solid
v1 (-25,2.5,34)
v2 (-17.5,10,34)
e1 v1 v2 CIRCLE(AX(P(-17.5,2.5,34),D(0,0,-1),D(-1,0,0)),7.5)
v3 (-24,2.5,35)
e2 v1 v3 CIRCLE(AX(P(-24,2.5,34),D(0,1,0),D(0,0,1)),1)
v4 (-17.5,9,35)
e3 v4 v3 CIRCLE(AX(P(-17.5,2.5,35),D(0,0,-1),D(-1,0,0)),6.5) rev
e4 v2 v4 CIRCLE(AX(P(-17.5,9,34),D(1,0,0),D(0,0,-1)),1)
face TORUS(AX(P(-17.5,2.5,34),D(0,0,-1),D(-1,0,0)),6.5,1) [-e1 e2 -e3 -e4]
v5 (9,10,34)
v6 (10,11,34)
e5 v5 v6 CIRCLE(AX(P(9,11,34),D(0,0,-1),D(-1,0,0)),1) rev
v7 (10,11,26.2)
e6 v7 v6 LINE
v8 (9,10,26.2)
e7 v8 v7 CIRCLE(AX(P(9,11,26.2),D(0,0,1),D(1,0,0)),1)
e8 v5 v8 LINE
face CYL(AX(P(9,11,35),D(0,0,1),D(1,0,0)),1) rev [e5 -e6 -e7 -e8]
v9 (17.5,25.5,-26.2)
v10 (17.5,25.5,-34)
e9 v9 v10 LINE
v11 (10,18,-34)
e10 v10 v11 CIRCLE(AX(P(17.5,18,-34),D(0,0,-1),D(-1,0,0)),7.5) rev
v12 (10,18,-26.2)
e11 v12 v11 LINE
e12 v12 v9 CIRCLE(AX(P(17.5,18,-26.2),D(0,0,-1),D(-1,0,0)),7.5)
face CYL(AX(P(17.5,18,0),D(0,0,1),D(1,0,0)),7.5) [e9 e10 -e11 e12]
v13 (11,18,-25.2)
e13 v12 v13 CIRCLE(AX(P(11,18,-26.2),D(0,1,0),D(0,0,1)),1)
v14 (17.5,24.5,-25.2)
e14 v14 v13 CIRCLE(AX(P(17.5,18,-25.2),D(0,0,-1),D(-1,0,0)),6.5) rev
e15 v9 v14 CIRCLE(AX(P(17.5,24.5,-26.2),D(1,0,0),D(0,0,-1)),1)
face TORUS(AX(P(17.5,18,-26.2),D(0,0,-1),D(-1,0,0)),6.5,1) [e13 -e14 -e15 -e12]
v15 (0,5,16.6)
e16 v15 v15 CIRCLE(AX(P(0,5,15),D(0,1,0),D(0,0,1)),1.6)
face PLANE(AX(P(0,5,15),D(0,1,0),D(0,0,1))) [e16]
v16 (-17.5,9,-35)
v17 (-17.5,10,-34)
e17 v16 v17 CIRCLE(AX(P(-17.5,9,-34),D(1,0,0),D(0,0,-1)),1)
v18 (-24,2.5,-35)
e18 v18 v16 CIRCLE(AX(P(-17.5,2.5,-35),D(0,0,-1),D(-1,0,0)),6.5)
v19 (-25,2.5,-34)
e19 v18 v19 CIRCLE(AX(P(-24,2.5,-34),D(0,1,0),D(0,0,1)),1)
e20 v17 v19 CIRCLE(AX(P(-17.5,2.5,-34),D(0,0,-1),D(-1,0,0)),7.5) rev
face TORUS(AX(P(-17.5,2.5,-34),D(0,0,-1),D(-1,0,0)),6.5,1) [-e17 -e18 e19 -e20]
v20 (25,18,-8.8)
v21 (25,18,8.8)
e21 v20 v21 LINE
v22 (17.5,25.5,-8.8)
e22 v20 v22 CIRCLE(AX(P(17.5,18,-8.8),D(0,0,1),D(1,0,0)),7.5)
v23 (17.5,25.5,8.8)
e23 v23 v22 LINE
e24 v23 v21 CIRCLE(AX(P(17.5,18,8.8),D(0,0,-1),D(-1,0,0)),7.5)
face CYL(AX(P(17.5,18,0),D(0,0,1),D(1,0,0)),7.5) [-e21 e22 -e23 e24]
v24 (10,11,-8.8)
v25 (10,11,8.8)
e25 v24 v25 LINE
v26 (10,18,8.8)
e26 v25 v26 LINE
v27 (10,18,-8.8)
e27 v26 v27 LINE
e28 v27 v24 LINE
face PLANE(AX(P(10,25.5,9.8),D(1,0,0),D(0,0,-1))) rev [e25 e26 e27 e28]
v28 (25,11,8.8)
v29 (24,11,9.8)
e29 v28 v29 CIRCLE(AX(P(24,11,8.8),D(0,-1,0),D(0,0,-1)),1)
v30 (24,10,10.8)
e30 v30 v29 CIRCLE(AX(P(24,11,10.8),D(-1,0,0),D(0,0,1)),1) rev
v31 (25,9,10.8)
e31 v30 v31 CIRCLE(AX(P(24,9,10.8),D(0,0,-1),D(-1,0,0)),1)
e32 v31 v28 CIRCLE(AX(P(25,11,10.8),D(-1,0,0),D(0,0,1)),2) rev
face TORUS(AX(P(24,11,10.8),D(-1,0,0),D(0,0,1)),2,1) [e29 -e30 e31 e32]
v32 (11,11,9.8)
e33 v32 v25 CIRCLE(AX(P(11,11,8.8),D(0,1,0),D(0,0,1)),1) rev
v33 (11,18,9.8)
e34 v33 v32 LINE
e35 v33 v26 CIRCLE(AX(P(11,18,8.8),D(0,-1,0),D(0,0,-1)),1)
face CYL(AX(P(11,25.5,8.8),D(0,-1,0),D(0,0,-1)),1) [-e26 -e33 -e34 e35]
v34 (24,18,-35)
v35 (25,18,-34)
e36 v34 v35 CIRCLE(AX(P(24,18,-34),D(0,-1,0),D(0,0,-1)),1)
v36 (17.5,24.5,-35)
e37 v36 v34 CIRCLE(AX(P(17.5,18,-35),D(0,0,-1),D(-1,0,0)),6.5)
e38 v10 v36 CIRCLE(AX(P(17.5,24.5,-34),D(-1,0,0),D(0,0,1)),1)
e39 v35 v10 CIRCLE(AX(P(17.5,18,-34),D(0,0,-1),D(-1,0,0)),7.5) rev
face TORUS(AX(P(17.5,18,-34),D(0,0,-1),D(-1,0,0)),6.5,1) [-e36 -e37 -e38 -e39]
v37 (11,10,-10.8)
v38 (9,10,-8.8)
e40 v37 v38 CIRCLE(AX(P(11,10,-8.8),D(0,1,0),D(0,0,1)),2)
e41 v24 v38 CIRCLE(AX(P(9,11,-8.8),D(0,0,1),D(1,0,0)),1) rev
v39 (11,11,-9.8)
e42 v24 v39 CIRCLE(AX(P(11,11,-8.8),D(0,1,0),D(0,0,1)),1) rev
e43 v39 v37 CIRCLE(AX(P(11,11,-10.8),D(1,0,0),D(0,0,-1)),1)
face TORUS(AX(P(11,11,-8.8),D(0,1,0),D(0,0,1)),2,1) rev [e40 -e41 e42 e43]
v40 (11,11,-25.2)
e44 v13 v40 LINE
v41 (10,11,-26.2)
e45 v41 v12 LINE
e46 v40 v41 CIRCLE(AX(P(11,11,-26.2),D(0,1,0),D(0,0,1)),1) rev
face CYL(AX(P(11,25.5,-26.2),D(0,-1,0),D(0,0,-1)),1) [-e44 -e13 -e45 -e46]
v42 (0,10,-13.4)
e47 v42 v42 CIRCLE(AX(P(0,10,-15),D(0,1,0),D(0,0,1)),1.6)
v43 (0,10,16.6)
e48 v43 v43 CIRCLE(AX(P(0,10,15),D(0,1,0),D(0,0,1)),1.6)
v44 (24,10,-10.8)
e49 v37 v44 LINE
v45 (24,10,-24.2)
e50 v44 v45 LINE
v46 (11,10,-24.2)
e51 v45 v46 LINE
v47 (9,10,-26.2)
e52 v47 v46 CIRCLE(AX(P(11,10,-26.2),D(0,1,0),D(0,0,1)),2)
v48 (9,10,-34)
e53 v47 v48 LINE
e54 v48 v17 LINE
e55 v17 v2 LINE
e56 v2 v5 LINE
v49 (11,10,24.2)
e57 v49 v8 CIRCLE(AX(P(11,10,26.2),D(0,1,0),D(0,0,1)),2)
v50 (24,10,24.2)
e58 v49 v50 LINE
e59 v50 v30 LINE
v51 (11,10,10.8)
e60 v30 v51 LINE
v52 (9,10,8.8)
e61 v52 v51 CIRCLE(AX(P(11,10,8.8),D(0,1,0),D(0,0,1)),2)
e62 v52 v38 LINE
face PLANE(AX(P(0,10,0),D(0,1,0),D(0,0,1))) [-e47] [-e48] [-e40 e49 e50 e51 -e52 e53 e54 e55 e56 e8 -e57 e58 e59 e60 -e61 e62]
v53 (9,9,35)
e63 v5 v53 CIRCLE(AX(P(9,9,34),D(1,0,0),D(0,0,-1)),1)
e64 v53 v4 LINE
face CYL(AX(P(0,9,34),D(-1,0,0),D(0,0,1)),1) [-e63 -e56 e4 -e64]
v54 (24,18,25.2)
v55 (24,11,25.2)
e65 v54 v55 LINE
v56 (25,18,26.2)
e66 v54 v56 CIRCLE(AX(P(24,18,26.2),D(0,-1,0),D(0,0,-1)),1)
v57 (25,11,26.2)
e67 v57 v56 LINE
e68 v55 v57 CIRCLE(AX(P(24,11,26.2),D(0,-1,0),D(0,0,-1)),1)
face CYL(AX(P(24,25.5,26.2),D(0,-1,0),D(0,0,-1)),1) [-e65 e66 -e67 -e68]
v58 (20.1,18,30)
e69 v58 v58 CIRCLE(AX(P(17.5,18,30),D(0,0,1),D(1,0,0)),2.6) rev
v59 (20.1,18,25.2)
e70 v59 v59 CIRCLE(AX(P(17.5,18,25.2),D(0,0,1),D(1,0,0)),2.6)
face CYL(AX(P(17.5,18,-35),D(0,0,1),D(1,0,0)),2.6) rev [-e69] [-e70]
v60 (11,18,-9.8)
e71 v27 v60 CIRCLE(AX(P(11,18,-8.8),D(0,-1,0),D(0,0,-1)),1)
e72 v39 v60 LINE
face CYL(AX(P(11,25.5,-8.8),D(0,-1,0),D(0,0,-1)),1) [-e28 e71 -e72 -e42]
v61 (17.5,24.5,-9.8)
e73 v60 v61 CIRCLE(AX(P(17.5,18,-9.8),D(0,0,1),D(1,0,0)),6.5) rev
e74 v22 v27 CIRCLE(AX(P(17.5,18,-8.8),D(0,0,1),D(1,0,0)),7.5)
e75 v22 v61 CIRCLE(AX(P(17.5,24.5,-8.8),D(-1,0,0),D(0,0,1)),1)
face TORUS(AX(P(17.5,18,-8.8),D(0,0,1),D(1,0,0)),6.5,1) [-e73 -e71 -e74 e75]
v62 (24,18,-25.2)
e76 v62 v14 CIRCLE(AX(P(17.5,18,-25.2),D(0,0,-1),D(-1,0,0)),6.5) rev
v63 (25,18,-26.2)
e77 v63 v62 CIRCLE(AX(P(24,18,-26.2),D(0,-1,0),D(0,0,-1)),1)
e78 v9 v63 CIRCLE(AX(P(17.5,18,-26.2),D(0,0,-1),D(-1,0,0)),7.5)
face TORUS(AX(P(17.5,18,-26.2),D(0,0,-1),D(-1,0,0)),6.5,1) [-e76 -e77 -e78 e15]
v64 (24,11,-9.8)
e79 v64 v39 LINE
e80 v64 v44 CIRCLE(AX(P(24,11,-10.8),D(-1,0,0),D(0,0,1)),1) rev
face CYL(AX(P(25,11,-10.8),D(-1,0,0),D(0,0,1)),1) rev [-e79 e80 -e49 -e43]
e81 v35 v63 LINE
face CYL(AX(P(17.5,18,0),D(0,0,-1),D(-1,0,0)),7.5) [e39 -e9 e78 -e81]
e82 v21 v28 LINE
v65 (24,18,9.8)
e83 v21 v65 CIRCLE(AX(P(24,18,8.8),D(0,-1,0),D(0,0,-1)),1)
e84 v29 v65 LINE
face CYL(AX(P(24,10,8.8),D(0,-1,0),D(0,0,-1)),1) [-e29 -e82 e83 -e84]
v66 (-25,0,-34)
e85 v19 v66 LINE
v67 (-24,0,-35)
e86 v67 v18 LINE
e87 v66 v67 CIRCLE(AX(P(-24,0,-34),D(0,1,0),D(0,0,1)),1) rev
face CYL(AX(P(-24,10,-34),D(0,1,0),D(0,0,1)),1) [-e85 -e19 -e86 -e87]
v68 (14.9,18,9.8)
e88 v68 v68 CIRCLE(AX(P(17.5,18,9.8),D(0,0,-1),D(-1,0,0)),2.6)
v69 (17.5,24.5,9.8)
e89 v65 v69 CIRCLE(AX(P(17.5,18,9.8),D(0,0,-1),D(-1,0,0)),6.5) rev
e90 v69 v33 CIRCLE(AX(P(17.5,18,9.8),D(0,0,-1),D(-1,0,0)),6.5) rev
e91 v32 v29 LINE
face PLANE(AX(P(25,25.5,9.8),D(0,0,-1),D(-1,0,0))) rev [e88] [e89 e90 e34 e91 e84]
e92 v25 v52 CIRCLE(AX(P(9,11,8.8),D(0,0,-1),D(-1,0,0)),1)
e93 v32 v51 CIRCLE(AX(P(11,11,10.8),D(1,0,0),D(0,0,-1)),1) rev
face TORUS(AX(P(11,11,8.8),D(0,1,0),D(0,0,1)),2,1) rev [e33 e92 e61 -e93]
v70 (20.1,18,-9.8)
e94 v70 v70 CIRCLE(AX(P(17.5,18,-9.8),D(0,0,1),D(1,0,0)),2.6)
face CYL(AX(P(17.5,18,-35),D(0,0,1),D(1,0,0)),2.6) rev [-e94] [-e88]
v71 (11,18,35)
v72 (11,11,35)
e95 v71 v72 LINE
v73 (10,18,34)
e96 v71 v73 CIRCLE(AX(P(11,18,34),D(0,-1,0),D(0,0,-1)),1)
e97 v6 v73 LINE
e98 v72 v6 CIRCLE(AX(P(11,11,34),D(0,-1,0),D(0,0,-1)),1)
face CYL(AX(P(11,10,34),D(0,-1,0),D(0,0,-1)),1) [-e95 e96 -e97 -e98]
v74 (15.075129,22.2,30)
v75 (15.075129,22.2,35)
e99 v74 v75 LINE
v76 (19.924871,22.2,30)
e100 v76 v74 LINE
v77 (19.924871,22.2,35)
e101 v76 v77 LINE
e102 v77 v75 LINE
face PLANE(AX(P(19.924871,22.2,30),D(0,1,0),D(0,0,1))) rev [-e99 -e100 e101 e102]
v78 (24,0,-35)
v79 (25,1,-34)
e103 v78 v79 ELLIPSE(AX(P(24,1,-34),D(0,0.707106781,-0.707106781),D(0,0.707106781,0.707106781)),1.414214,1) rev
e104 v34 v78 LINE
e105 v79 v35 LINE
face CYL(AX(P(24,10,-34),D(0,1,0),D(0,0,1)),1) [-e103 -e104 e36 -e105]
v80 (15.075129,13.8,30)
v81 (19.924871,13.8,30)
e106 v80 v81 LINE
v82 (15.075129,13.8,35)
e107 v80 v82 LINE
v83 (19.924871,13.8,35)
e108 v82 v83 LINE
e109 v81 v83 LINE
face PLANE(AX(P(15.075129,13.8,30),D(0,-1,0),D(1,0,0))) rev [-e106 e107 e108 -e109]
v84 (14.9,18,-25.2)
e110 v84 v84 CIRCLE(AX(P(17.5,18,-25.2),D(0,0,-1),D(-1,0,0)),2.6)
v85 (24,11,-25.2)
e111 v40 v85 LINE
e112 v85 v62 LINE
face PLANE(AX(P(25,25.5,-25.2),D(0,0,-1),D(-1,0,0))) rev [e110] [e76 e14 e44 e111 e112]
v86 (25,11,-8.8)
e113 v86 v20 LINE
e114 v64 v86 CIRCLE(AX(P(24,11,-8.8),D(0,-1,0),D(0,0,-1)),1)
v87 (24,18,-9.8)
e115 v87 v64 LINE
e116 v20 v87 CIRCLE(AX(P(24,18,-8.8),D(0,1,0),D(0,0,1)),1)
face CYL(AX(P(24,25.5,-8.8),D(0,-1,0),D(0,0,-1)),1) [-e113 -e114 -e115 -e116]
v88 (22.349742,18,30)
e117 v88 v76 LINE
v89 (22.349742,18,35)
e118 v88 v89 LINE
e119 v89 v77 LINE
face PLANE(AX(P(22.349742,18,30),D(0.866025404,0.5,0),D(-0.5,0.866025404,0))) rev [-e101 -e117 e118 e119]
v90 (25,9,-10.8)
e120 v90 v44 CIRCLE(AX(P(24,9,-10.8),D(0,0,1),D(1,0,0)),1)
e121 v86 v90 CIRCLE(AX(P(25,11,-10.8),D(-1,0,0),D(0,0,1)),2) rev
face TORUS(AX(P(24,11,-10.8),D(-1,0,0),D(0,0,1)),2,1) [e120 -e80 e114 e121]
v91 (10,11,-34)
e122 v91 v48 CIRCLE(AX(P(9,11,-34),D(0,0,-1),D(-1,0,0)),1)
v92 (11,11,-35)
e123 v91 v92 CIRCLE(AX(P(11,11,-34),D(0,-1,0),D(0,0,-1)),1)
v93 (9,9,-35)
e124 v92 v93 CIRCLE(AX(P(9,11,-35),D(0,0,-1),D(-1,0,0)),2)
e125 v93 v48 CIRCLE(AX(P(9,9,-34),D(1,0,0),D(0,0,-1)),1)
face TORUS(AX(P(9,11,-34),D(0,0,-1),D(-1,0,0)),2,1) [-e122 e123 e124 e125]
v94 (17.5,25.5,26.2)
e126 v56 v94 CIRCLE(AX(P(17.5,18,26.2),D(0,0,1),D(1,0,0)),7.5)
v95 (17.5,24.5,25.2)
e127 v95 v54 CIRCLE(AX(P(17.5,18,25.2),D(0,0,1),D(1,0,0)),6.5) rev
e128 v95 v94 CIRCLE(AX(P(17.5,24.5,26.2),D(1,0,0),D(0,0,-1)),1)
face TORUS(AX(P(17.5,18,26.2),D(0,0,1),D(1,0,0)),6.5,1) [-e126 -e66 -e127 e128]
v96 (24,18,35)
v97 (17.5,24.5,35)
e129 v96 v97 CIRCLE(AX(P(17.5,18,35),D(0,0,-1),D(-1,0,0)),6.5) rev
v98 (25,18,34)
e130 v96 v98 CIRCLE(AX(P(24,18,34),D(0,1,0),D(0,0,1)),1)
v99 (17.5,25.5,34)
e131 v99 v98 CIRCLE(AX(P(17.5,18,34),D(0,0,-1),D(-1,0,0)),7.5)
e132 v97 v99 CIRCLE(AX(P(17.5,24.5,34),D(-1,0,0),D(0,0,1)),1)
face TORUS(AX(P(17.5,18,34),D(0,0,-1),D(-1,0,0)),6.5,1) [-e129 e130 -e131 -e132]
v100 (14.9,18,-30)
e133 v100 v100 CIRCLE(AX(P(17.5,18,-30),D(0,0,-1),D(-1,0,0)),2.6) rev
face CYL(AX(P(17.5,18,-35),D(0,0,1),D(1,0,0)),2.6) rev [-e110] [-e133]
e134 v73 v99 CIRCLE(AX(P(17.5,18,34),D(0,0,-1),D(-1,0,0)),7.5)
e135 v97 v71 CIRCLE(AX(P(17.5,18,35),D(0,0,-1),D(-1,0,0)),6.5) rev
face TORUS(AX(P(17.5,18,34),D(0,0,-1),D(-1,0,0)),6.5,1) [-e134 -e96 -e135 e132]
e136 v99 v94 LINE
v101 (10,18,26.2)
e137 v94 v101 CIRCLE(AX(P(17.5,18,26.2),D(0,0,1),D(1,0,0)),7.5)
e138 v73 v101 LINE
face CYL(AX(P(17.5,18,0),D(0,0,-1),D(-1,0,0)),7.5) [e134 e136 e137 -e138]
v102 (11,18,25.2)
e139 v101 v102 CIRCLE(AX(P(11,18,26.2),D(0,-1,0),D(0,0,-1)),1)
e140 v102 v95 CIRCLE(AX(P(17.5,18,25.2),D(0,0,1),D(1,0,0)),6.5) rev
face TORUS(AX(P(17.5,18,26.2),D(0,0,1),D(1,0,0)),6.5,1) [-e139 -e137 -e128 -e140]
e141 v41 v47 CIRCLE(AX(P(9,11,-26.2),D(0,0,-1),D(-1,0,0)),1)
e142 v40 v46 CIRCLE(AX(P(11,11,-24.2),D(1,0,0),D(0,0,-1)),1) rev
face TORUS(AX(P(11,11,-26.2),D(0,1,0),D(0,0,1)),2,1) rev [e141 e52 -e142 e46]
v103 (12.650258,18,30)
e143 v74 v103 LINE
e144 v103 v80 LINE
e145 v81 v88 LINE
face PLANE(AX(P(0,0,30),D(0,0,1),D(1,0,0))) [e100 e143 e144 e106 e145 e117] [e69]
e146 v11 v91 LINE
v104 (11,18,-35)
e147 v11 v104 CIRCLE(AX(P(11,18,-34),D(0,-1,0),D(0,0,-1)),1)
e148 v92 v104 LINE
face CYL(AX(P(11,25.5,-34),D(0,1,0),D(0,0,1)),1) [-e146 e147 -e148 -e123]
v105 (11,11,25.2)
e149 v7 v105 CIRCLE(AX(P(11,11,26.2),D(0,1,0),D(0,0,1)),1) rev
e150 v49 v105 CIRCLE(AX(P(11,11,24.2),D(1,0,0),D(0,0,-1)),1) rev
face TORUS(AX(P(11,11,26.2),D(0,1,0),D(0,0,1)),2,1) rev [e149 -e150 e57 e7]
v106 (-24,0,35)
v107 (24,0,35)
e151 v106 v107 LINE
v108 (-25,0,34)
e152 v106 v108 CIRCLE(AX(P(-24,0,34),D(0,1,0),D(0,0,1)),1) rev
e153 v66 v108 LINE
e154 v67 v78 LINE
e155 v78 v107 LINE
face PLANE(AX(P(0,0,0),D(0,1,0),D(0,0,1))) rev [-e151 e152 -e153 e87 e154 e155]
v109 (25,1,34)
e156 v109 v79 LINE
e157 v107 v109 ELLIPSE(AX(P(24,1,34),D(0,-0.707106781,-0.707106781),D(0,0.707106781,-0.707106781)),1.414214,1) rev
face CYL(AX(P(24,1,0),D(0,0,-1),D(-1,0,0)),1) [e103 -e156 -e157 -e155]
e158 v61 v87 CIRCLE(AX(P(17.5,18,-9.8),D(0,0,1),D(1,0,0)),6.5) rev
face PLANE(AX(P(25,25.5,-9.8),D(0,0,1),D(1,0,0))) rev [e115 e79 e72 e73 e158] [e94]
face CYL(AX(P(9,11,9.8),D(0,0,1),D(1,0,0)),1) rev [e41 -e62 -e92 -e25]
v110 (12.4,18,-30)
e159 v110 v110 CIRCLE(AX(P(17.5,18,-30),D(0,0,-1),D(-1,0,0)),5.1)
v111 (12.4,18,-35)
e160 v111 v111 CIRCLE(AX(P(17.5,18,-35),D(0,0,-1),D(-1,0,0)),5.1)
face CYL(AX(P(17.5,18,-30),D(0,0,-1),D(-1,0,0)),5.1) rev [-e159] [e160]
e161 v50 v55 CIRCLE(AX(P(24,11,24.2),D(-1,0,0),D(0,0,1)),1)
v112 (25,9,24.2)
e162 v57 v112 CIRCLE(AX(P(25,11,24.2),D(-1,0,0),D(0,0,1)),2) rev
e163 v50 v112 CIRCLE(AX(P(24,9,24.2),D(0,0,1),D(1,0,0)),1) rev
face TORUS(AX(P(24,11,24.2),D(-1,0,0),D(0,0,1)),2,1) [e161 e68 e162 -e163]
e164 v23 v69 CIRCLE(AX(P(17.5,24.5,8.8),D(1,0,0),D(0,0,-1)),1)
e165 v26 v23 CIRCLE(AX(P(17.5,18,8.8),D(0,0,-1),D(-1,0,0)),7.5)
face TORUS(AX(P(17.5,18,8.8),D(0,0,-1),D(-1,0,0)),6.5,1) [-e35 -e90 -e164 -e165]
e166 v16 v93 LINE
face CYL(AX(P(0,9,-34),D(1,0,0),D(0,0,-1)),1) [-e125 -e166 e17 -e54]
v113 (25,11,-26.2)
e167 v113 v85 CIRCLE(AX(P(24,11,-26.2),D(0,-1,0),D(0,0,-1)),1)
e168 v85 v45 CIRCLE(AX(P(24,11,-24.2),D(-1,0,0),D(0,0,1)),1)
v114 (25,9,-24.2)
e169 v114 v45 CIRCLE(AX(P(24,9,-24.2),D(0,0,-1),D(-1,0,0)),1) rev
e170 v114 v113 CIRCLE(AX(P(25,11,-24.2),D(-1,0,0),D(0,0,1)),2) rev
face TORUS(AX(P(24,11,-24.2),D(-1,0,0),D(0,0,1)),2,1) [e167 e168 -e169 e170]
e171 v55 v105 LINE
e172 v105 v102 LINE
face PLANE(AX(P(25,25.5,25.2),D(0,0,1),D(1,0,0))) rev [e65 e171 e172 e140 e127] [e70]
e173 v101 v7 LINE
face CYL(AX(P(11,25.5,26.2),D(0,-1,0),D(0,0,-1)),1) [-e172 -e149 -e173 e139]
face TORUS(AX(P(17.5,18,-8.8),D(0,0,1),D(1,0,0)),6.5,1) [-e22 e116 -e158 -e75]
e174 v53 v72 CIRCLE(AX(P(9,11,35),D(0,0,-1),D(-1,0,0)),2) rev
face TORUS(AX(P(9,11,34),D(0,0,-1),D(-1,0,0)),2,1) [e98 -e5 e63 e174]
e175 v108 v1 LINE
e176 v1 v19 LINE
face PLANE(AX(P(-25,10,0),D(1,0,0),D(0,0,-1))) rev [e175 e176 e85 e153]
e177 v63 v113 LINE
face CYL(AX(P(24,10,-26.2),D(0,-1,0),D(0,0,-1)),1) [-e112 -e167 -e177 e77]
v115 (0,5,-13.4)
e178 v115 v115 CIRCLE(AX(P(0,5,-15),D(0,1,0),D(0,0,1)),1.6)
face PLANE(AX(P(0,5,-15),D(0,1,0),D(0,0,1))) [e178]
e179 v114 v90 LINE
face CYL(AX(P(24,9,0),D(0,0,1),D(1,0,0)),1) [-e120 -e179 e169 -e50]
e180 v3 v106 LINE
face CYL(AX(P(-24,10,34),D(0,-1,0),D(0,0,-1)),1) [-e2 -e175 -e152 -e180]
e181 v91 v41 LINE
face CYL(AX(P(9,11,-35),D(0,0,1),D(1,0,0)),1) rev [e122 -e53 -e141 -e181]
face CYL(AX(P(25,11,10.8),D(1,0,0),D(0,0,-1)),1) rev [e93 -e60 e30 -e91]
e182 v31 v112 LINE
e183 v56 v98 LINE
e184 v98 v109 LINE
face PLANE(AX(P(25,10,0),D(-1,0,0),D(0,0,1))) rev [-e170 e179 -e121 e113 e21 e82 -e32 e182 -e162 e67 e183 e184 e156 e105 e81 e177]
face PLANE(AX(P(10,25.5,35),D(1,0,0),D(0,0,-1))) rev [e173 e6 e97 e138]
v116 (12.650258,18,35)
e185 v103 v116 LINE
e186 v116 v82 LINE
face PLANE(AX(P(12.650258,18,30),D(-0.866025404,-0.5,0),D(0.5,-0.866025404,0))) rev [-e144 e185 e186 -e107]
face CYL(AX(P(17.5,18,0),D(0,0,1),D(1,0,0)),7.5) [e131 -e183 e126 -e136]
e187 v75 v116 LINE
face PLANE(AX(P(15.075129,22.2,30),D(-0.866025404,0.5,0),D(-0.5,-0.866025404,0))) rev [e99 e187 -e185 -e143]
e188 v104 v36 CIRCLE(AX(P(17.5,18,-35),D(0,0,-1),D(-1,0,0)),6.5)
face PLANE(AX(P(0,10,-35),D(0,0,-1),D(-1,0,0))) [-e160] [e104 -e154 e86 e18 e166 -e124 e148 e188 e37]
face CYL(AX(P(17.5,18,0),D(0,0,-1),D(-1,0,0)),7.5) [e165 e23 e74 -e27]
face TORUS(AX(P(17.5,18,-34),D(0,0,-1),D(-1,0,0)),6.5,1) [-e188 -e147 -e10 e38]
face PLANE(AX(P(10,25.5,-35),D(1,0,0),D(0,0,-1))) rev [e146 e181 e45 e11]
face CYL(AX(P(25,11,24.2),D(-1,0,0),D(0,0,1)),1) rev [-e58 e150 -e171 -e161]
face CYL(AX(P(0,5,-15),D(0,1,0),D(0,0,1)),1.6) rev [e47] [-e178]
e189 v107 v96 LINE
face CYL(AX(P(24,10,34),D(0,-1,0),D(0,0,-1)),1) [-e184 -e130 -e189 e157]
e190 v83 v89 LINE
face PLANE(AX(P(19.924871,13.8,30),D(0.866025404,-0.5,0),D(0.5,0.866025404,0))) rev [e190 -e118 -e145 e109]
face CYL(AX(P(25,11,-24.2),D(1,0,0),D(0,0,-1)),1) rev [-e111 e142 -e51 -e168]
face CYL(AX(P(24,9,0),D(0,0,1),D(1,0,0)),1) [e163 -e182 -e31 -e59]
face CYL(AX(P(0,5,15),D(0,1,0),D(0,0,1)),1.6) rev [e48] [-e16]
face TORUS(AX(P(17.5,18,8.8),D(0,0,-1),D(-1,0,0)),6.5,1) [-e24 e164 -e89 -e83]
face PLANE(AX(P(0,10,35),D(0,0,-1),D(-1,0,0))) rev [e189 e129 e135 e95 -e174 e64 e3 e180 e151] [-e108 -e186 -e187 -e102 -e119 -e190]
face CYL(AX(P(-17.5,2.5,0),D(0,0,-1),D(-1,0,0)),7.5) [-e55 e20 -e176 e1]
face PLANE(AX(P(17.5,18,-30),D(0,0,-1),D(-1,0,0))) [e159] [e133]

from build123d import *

# Parameters (mm, degrees)
SKETCH1_W           = 50
SKETCH1_H           = 70
BOSS_EXTRUDE1_DEPTH = 10
SKETCH4_W           = 15
SKETCH4_H           = 9.8
SKETCH4_H_2         = 19.6
BOSS_EXTRUDE2_DEPTH = 15.5
SKETCH5_R           = 2.6
CUT_EXTRUDE1_DEPTH  = 79.582758923
FILLET1_R           = 7.5
CUT_EXTRUDE2_DEPTH  = 5
SKETCH7_R           = 5.1
CUT_EXTRUDE3_DEPTH  = 5
FILLET2_R           = 7.5
SKETCH8_R           = 1.6
CUT_EXTRUDE4_DEPTH  = 5
FILLET3_R           = 1


with BuildPart() as part:
    # Sketch1 → Boss-Extrude1 (new body)
    with BuildSketch(Plane(origin=(0, 0, 0), x_dir=(1, 0, 0), z_dir=(0, 1, 0))):
        Rectangle(SKETCH1_W, SKETCH1_H)
    extrude(amount=BOSS_EXTRUDE1_DEPTH)

    # Sketch4 → Boss-Extrude2 (add)
    with BuildSketch(Plane(origin=(0, 10, 0), x_dir=(1, 0, 0), z_dir=(0, 1, 0))):
        with Locations((17.5, 30.1)):
            Rectangle(SKETCH4_W, SKETCH4_H)
        with Locations((17.5, -30.1)):
            Rectangle(SKETCH4_W, SKETCH4_H)
        with Locations((17.5, 0)):
            Rectangle(SKETCH4_W, SKETCH4_H_2)
    extrude(amount=BOSS_EXTRUDE2_DEPTH)

    # Sketch5 → Cut-Extrude1 (cut, through all)
    with BuildSketch(Plane.XY.offset(35)):
        with Locations((17.5, 18)):
            Circle(SKETCH5_R)
    extrude(amount=-CUT_EXTRUDE1_DEPTH, mode=Mode.SUBTRACT)

    # Fillet1
    fillet1_edges = [part.edges().sort_by_distance(p)[0] for p in [
        (10, 25.5, -30.1),
        (10, 25.5, 0),
        (10, 25.5, 30.1),
        (25, 25.5, 30.1),
        (25, 25.5, 0),
        (25, 25.5, -30.1),
    ]]
    fillet(fillet1_edges, radius=FILLET1_R - 0.0001)  # a hair under: the kernel refuses the full size

    # Sketch6 → Cut-Extrude2 (cut)
    with BuildSketch(Plane.XY.offset(35)):
        Polygon((19.924871131, 13.8), (22.349742261, 18), (19.924871131, 22.2), (15.075128869, 22.2), (12.650257739, 18), (15.075128869, 13.8), align=None)
    extrude(amount=-CUT_EXTRUDE2_DEPTH, mode=Mode.SUBTRACT)

    # Sketch7 → Cut-Extrude3 (cut)
    with BuildSketch(Plane(origin=(0, 0, -35), x_dir=(-1, 0, 0), z_dir=(0, 0, -1))):
        with Locations((-17.5, 18)):
            Circle(SKETCH7_R)
    extrude(amount=-CUT_EXTRUDE3_DEPTH, mode=Mode.SUBTRACT)

    # Fillet2
    fillet2_edges = [part.edges().sort_by_distance(p)[0] for p in [
        (-25, 10, 0),
    ]]
    fillet(fillet2_edges, radius=FILLET2_R)

    # Sketch8 → Cut-Extrude4 (cut)
    with BuildSketch(Plane(origin=(0, 10, 0), x_dir=(1, 0, 0), z_dir=(0, 1, 0))):
        with Locations(Location((0, 15, 0), (0, 0, 270))):
            Circle(SKETCH8_R)
        with Locations(Location((0, -15, 0), (0, 0, 270))):
            Circle(SKETCH8_R)
    extrude(amount=-CUT_EXTRUDE4_DEPTH, mode=Mode.SUBTRACT)

    # Fillet3
    fillet3_edges = [part.edges().sort_by_distance(p)[0] for p in [
        (-3.75, 10, -35),
        (-3.75, 10, 35),
        (-25, 1.25, 35),
        (-22.803300859, 7.803300859, 35),
        (-25, 1.25, -35),
        (-22.803300859, 7.803300859, -35),
        (10, 10, -30.1),
        (17.5, 10, -25.2),
        (25, 10, 17.5),
        (17.5, 10, 25.2),
        (10, 10, 30.1),
        (25, 10, -17.5),
        (17.5, 10, -9.8),
        (10, 10, 0),
        (17.5, 10, 9.8),
        (25, 0, 0),
        (25, 14.00005, -25.2),
        (10, 14.00005, -25.2),
        (22.803330148, 23.303330148, -25.2),
        (12.196669852, 23.303330148, -25.2),
        (10, 14.00005, -35),
        (25, 9.00005, -35),
        (22.803330148, 23.303330148, -35),
        (12.196669852, 23.303330148, -35),
        (25, 14.00005, 9.8),
        (10, 14.00005, 9.8),
        (22.803330148, 23.303330148, 9.8),
        (12.196669852, 23.303330148, 9.8),
        (10, 14.00005, -9.8),
        (25, 14.00005, -9.8),
        (22.803330148, 23.303330148, -9.8),
        (12.196669852, 23.303330148, -9.8),
        (25, 9.00005, 35),
        (10, 14.00005, 35),
        (22.803330148, 23.303330148, 35),
        (12.196669852, 23.303330148, 35),
        (10, 14.00005, 25.2),
        (25, 14.00005, 25.2),
        (22.803330148, 23.303330148, 25.2),
        (12.196669852, 23.303330148, 25.2),
    ]]
    fillet(fillet3_edges, radius=FILLET3_R)


solid = part.part
